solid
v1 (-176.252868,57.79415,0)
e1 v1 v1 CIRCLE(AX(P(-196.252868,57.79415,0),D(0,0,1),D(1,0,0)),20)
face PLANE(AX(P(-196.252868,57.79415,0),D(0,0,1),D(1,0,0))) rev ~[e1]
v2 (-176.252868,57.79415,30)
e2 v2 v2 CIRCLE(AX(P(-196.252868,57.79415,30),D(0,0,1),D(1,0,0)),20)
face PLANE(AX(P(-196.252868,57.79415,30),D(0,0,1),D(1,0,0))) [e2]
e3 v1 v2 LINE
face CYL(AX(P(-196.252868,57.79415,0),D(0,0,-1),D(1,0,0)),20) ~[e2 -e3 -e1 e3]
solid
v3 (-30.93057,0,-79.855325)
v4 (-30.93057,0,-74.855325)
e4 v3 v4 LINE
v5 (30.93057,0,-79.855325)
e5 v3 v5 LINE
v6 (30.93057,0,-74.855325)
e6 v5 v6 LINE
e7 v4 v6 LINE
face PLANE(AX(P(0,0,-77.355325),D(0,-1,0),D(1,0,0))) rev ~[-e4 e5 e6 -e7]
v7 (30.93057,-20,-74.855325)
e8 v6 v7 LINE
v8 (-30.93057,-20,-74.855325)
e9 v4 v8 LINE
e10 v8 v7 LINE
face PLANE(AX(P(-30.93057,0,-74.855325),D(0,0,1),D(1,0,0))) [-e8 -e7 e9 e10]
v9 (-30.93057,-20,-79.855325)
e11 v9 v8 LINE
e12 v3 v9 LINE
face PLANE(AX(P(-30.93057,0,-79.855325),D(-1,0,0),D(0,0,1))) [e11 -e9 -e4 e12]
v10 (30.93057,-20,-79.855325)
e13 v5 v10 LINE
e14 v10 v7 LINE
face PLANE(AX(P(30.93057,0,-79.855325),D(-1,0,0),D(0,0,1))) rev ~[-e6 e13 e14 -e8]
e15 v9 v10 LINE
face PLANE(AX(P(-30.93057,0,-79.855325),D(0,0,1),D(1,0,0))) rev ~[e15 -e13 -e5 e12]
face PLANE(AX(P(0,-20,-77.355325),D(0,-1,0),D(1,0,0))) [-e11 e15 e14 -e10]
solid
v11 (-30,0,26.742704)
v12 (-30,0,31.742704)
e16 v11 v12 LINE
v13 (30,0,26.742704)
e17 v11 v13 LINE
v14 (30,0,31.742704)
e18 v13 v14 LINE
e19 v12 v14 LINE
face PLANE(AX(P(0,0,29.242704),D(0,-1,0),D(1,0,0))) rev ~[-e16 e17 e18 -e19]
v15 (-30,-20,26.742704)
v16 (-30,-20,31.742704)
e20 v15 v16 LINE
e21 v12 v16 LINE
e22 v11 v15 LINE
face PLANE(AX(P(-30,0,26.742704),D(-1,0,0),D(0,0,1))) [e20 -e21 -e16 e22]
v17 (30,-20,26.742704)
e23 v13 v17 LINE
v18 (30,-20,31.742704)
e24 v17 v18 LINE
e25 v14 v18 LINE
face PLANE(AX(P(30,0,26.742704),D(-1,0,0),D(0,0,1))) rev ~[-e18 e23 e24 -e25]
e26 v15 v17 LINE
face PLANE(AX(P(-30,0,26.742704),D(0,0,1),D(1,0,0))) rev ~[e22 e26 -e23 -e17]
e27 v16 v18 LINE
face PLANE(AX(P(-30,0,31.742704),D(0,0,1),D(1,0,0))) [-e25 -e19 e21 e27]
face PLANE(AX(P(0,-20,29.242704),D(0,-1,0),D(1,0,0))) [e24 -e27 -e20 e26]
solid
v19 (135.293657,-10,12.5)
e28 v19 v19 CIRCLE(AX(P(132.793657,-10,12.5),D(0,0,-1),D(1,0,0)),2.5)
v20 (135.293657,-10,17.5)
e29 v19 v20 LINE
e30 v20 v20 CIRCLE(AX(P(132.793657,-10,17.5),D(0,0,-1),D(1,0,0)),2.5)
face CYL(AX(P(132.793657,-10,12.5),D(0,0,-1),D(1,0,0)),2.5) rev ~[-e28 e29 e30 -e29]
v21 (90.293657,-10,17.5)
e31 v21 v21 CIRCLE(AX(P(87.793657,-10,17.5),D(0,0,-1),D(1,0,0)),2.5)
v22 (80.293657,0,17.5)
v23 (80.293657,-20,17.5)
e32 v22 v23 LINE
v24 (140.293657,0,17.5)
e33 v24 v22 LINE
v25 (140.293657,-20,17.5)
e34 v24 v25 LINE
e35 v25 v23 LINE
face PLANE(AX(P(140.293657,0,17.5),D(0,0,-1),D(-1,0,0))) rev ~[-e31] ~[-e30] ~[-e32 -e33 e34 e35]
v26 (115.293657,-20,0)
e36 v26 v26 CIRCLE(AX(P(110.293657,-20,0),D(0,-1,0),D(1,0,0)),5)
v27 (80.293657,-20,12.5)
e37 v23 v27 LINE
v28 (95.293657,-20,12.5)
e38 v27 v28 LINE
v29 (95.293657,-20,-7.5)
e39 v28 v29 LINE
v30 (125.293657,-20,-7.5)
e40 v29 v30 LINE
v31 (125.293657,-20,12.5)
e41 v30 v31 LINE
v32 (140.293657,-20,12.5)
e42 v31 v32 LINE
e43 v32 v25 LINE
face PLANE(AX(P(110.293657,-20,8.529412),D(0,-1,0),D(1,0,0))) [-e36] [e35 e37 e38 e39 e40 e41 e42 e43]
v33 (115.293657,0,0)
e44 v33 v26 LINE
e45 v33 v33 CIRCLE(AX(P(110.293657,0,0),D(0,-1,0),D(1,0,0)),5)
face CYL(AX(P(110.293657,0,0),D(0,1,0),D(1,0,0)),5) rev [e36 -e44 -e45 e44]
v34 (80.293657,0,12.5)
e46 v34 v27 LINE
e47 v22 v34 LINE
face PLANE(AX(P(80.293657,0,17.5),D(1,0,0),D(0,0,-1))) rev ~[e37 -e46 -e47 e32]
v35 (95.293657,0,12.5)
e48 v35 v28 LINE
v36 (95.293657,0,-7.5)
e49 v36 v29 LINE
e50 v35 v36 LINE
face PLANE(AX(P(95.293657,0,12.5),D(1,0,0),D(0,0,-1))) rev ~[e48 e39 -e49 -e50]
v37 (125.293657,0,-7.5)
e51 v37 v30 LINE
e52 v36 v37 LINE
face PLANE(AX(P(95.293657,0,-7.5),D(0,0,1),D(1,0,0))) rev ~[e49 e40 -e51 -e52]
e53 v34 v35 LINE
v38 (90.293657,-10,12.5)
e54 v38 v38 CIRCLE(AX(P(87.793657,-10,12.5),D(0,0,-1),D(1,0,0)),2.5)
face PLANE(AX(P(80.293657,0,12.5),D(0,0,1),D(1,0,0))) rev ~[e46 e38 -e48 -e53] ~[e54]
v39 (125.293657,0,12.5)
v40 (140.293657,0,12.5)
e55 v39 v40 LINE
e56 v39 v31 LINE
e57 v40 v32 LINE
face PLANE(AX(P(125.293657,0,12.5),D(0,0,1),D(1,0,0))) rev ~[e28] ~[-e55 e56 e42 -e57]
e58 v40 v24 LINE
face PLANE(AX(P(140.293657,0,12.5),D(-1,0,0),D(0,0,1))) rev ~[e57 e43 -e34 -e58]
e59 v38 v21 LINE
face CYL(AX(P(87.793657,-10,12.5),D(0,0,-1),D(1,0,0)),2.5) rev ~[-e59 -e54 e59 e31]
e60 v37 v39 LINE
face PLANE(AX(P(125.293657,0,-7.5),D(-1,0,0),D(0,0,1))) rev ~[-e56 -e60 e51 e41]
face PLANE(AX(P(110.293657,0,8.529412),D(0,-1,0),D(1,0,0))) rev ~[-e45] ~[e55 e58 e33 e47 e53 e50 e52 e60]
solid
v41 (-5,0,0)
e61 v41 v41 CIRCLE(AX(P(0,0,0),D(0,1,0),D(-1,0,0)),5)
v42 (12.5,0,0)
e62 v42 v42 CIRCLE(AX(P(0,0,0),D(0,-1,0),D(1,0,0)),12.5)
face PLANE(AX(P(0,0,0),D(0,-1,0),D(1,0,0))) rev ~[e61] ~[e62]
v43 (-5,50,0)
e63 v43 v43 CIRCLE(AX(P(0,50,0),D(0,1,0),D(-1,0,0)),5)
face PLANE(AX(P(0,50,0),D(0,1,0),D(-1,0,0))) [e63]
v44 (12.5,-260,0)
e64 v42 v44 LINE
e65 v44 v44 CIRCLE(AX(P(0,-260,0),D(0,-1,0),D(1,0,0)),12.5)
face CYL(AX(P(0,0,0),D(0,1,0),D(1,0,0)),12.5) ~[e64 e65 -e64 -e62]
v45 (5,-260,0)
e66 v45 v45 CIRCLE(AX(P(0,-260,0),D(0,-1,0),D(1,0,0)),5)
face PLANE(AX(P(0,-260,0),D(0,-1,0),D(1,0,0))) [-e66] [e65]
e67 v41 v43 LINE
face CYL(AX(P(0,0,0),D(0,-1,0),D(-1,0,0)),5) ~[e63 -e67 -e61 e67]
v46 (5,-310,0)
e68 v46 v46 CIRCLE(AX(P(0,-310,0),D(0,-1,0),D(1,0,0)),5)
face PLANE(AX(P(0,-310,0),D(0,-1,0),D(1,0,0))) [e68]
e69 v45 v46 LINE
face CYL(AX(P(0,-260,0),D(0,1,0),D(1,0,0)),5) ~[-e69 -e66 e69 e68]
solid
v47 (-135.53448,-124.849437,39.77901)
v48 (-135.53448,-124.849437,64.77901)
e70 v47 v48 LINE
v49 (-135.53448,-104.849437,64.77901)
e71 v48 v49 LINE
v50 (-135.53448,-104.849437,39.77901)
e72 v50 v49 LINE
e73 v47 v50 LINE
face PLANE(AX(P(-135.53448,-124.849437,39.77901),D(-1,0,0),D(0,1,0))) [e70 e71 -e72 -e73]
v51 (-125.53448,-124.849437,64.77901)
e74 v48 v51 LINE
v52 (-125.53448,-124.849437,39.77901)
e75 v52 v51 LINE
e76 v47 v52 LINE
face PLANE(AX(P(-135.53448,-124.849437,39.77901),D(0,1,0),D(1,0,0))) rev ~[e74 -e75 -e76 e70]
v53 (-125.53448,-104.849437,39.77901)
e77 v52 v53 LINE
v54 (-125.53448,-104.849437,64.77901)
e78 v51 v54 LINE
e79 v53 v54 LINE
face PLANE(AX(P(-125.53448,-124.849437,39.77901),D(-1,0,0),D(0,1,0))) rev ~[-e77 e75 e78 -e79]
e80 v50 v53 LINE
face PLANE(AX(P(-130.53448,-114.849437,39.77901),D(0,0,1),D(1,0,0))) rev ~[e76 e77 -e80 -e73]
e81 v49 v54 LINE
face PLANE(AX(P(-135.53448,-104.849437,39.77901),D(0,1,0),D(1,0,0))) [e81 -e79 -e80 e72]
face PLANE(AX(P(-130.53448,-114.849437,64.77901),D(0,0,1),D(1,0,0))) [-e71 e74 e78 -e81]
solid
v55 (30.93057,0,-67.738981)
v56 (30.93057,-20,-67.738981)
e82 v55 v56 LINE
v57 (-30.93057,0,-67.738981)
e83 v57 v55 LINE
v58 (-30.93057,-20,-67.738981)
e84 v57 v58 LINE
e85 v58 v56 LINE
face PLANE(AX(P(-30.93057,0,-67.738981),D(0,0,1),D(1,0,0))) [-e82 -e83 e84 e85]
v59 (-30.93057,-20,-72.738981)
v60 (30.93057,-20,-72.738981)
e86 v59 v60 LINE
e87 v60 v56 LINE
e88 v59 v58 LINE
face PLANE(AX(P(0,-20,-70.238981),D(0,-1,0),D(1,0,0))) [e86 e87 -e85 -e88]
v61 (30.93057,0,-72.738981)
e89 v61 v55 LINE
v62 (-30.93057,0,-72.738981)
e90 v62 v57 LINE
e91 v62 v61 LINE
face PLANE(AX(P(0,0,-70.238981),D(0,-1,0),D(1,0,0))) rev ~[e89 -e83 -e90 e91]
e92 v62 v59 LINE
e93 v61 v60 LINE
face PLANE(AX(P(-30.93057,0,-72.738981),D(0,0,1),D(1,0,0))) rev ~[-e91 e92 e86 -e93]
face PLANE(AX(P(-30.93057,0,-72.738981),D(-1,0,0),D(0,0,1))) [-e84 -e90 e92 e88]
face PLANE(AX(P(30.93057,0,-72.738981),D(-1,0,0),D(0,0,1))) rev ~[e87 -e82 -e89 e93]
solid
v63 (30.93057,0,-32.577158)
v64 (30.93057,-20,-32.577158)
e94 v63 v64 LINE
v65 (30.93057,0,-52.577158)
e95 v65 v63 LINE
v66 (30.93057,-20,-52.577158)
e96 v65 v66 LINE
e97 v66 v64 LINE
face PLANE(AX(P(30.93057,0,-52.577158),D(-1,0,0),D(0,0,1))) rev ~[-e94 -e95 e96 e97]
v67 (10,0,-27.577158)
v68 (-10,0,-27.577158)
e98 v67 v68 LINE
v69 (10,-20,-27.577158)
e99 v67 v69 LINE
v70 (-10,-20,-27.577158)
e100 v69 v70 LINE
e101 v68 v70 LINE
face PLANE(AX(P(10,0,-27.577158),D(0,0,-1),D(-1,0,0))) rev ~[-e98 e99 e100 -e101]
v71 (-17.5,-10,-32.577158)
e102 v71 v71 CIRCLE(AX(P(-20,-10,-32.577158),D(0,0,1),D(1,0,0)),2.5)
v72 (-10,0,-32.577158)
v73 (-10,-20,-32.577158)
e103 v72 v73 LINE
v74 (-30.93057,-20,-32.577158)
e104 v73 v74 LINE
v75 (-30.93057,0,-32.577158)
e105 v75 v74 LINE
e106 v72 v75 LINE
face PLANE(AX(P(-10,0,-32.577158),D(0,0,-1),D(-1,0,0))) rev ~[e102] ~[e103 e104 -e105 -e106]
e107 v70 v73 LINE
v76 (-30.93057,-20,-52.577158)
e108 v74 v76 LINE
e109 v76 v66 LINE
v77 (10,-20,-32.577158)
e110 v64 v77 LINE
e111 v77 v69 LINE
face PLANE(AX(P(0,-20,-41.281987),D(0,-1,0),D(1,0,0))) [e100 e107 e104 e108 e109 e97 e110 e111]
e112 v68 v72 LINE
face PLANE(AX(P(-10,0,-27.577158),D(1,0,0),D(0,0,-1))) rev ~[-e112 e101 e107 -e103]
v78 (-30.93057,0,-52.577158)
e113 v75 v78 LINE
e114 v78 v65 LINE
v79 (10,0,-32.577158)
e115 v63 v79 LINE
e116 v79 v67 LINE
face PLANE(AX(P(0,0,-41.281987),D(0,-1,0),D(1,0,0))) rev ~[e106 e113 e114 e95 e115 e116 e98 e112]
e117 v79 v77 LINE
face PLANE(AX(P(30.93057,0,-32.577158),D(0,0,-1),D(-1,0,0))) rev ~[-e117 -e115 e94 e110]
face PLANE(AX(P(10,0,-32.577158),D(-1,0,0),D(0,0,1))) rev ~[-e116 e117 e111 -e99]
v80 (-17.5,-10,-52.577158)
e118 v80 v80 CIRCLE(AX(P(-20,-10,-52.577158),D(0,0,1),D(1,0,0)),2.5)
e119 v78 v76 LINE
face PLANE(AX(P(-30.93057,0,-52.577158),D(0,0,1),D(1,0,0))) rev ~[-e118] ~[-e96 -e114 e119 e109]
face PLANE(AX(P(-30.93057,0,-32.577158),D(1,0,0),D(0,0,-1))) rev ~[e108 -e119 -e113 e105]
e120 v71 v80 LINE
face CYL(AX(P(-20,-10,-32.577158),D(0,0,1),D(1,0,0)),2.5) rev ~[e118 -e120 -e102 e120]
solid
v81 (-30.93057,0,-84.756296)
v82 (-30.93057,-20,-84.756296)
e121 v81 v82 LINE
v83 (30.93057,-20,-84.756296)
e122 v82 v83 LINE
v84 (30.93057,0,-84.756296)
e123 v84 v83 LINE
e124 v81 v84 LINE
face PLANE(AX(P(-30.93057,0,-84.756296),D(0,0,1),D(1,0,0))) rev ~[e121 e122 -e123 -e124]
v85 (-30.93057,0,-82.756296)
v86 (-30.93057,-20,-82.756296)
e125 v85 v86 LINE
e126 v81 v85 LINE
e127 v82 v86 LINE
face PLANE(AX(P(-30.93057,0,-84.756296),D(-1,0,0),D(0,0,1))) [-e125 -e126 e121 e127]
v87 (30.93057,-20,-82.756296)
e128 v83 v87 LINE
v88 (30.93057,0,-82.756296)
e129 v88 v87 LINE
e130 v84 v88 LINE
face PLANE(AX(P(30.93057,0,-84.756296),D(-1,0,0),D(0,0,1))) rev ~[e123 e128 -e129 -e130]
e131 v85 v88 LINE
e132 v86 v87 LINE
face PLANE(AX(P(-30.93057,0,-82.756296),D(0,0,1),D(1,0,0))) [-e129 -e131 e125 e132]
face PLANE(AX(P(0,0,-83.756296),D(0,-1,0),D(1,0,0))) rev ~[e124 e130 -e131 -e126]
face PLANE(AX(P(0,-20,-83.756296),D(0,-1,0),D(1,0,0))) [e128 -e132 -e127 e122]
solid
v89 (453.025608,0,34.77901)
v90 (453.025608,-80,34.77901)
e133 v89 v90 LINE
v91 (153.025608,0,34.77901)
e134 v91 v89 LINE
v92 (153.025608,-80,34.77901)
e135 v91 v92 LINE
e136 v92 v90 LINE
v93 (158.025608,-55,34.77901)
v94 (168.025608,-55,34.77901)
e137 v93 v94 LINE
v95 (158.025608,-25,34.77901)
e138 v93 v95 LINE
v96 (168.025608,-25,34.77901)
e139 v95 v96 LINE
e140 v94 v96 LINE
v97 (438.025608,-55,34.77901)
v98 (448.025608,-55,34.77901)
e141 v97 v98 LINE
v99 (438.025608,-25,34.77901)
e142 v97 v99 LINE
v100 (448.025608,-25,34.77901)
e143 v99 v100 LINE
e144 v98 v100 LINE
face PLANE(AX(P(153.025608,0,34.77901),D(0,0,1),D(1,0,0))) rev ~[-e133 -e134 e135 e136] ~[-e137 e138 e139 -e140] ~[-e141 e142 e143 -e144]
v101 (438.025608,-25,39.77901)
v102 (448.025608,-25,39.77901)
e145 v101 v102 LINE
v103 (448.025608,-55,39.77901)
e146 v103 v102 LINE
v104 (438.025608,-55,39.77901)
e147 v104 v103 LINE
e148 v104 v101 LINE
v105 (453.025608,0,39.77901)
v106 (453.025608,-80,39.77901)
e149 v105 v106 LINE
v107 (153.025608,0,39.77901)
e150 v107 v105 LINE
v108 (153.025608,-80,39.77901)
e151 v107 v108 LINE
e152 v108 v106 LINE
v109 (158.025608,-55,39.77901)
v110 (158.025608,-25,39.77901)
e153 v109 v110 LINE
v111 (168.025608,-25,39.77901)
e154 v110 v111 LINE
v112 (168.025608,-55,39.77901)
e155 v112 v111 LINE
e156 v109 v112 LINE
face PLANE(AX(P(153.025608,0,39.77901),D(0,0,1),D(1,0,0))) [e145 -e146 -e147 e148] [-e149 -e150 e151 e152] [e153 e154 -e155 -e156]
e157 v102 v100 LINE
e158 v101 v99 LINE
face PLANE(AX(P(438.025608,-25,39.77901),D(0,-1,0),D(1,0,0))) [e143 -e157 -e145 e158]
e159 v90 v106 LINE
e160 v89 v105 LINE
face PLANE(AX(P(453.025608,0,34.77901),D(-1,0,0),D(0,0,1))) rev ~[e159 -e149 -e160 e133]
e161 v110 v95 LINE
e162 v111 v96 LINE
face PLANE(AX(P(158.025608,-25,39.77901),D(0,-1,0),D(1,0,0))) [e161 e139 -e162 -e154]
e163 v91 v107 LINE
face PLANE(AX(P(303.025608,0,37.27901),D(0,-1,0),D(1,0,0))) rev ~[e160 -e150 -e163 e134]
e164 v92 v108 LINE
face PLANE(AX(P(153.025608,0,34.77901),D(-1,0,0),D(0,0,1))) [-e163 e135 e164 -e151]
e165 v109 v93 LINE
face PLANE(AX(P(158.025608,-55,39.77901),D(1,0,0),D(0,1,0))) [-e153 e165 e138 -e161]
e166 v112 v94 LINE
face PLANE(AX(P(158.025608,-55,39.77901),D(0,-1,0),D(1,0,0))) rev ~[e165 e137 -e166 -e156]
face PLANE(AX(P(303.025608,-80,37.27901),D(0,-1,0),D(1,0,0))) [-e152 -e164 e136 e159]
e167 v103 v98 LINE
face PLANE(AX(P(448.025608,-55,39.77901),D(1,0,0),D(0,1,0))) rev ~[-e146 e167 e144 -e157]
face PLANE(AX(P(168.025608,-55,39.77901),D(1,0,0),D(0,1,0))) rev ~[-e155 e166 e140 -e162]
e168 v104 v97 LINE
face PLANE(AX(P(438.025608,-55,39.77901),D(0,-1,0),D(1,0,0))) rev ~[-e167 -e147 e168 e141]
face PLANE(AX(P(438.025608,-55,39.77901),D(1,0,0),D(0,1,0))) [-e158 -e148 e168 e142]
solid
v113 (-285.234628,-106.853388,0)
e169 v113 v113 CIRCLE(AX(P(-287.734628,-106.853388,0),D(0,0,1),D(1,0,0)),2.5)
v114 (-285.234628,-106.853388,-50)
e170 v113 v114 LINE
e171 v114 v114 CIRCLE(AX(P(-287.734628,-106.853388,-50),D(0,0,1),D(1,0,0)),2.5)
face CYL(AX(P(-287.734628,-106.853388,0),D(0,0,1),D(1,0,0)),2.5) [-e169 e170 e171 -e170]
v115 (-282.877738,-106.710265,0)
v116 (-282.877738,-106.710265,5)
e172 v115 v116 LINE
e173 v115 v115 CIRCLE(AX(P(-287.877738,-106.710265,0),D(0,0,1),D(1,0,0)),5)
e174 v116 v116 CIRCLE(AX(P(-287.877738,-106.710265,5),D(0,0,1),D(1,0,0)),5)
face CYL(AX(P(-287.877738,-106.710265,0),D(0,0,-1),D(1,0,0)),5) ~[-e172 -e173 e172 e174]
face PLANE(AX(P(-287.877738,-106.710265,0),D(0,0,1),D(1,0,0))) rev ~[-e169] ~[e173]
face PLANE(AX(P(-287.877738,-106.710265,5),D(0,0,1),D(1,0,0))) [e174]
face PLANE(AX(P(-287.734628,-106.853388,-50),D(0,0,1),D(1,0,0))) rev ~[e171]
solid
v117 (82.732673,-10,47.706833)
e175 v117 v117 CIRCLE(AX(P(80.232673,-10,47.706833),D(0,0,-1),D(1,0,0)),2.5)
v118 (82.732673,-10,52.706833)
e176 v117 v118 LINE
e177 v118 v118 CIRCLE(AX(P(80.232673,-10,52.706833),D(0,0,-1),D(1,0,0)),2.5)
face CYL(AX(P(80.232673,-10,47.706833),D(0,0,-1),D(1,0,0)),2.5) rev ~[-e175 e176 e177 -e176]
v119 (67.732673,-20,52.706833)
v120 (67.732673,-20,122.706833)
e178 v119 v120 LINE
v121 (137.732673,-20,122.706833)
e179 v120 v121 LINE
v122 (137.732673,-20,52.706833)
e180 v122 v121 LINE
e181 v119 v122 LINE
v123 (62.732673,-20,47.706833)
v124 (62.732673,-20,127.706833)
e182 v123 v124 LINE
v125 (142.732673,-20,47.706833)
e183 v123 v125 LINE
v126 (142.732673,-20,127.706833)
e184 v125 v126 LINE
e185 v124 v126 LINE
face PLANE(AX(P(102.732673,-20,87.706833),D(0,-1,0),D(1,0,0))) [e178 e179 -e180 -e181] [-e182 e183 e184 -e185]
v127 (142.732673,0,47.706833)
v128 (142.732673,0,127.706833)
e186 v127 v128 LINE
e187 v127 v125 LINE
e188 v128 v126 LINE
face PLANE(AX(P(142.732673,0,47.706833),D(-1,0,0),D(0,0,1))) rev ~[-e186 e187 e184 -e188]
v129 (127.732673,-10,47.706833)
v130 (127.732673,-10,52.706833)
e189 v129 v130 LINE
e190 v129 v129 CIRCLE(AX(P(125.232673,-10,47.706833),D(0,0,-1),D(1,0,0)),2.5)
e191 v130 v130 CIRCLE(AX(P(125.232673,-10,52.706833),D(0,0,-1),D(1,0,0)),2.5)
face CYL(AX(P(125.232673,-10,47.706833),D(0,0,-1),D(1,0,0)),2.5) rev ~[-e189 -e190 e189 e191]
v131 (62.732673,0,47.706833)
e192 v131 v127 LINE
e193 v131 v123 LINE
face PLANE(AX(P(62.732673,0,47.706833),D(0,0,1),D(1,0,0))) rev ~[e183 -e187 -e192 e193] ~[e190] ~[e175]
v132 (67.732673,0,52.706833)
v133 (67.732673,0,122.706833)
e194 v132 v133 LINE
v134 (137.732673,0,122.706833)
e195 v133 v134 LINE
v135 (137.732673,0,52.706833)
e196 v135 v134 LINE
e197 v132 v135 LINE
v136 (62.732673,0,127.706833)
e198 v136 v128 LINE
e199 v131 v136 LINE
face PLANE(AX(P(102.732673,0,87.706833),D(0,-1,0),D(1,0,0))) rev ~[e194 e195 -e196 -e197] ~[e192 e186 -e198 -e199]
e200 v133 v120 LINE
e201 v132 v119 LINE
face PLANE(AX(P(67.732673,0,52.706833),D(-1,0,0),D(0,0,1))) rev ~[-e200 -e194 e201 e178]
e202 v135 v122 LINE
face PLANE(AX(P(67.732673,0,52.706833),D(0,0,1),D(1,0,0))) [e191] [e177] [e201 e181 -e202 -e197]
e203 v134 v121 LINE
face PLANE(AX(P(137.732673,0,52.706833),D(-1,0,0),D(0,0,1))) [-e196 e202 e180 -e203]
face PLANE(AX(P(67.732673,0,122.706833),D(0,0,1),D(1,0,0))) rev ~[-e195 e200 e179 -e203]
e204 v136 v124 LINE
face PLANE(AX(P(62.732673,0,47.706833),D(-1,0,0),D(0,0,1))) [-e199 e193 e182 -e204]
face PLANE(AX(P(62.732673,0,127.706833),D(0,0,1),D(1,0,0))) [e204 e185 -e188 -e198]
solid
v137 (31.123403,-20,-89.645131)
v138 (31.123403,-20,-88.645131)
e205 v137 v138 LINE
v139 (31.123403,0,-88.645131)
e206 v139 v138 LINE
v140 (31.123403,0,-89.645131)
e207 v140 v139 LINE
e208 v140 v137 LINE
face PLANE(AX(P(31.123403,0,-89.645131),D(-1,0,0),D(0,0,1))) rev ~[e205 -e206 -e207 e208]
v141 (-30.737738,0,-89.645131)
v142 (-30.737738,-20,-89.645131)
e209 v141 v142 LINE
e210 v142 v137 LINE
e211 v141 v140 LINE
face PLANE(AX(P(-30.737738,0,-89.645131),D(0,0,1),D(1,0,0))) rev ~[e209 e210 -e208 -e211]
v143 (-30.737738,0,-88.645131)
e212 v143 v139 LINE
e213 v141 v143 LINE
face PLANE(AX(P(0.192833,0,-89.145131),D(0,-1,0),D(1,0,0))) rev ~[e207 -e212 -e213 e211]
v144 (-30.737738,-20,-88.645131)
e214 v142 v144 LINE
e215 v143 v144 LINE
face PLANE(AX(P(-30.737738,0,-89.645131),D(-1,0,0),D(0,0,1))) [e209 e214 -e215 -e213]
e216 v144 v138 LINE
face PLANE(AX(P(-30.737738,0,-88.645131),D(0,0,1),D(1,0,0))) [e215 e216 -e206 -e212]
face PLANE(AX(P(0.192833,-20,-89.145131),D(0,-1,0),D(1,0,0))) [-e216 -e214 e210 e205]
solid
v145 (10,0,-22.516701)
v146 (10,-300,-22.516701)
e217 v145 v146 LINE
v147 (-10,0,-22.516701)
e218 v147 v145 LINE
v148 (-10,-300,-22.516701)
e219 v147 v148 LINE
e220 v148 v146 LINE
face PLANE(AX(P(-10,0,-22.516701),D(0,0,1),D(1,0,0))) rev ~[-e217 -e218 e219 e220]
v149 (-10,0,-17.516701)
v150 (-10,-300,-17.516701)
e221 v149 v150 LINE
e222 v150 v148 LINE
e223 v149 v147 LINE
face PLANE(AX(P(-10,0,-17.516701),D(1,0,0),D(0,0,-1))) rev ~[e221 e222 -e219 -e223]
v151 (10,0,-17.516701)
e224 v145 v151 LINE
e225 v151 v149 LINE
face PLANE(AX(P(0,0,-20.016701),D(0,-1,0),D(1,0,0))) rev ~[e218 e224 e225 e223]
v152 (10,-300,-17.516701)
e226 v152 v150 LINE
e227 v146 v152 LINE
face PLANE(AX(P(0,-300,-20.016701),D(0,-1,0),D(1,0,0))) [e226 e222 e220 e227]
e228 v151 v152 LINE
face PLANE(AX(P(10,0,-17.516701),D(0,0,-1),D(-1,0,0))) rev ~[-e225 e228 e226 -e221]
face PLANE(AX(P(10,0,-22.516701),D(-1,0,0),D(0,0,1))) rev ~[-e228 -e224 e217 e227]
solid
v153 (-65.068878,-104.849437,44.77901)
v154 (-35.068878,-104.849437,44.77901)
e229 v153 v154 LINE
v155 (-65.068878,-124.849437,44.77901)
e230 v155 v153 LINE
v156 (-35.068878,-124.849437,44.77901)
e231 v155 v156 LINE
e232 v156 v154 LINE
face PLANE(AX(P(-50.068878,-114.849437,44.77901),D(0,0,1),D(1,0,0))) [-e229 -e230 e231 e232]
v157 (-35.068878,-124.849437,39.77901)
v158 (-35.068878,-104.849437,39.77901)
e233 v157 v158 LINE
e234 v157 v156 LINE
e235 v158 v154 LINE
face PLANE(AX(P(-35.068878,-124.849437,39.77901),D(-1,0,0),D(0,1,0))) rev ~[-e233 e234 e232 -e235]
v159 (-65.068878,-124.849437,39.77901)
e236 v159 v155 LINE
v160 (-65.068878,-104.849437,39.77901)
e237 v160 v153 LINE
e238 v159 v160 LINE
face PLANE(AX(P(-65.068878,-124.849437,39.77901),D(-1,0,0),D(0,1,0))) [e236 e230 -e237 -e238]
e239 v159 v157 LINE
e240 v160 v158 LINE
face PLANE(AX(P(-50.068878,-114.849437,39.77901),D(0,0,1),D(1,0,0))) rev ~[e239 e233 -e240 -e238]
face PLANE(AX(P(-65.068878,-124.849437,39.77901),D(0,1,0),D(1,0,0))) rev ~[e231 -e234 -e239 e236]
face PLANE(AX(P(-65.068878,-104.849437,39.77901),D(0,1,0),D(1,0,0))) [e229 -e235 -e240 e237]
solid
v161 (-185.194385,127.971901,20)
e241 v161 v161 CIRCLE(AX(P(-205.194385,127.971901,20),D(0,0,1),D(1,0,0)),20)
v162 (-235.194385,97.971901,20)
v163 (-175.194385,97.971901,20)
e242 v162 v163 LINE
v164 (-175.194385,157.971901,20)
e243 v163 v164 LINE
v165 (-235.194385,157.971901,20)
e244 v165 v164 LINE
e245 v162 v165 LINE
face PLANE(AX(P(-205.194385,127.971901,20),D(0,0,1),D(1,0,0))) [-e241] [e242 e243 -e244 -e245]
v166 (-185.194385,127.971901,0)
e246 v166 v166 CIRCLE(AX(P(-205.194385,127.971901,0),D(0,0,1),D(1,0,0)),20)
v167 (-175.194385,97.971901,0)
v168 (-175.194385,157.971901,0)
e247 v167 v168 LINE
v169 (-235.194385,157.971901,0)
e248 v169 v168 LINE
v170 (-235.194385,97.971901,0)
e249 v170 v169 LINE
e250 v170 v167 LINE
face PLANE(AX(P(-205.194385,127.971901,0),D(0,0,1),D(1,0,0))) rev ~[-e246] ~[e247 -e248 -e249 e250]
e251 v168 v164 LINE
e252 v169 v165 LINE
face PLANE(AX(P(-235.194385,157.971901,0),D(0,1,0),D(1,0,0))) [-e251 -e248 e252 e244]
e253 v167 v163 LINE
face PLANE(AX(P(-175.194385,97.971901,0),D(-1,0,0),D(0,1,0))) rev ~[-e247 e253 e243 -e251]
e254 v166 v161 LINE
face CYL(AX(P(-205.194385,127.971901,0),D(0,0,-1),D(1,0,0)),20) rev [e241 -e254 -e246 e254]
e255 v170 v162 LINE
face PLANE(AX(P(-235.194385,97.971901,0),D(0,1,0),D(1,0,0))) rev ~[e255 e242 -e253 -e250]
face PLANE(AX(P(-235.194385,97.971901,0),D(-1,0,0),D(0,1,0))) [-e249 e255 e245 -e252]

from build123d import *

# Parameters (mm, degrees)
F0_R      = 5
F1_DEPTH  = 20
F0_W      = 60
F0_H      = 5
F0_W_2    = 80
F0_H_2    = 80
F0_W_3    = 70
F0_H_3    = 70
F0_W_4    = 61.861140081
F0_H_4    = 1
F0_H_5    = 2
F0_R_2    = 12.5
F2_DEPTH  = 260
F3_R      = 5
F4_DEPTH  = 50
F5_DEPTH  = 300
F6_R      = 2.5
F7_DEPTH  = 25
F9_R      = 2.5
F8_R      = 2.5
F10_DEPTH = 25
F14_R     = 5
F15_DEPTH = 50
F16_W     = 300
F16_H     = 5
F17_DEPTH = 80
F19_R     = 20
F20_DEPTH = 30
F19_W     = 60
F19_H     = 60
F21_DEPTH = 20
F18_W     = 10
F18_H     = 30
F22_DEPTH = 129.4251411048
F18_H_2   = 20
F23_DEPTH = 25
F18_W_2   = 30
F24_DEPTH = 5
F13_R     = 2.5
F25_DEPTH = 5
F26_R     = 5
F27_DEPTH = 5
F28_R     = 2.5
F29_DEPTH = 50


# Not quite as in the source:
# - a feature of the source that left no trace in its solid (it failed there, or was rolled back) is left out
# - a feature names something its author has since deleted; it is built from what else it names


with BuildPart() as f1:
    # F0 (on Front) → F1 (new body)
    with BuildSketch(Plane.XZ):
        Polygon((95.2936565876, -7.5), (110.2936565876, -7.5), (125.2936565876, -7.5), (125.2936565876, 12.5), (140.2936565876, 12.5), (140.2936565876, 17.5), (110.2936565876, 17.5), (80.2936565876, 17.5), (80.2936565876, 12.5), (95.2936565876, 12.5), align=None)
        with Locations((110.2936565876, 0)):
            Circle(F0_R, mode=Mode.SUBTRACT)
    extrude(amount=F1_DEPTH)

    # F9 (on face) + F8 (on face) → F10 (cut)
    with BuildSketch(Plane(origin=(0, 0, 12.5), x_dir=(1, 0, 0), z_dir=(0, 0, -1))):
        with Locations((87.7936565876, 10)):
            Circle(F9_R)
    with BuildSketch(Plane(origin=(0, 0, 12.5), x_dir=(1, 0, 0), z_dir=(0, 0, -1))):
        with Locations((132.7936565876, 10)):
            Circle(F8_R)
    extrude(amount=-F10_DEPTH, mode=Mode.SUBTRACT)


with BuildPart() as f1b:
    # F0 (on Front) → F1, piece 2 (new body)
    with BuildSketch(Plane.XZ):
        with Locations((0, 29.2427036911)):
            Rectangle(F0_W, F0_H)
    extrude(amount=F1_DEPTH)


with BuildPart() as f1c:
    # F0 (on Front) → F1, piece 3 (new body)
    with BuildSketch(Plane.XZ):
        Polygon((10, -27.5771580637), (0, -27.5771580637), (-10, -27.5771580637), (-10, -32.5771580637), (-10.9305700405, -32.5771580637), (-30.9305700405, -32.5771580637), (-30.9305700405, -52.5771580637), (0, -52.5771580637), (30.9305700405, -52.5771580637), (30.9305700405, -32.5771580637), (10.9305700405, -32.5771580637), (10, -32.5771580637), align=None)
    extrude(amount=F1_DEPTH)

    # F6 (on face) → F7 (cut)
    with BuildSketch(Plane.XY.offset(-32.5771580637)):
        with Locations((-20, -10)):
            Circle(F6_R)
    extrude(amount=-F7_DEPTH, mode=Mode.SUBTRACT)


with BuildPart() as f1d:
    # F0 (on Front) → F1, piece 4 (new body)
    with BuildSketch(Plane.XZ):
        with Locations((102.7326732874, 87.7068325877)):
            Rectangle(F0_W_2, F0_H_2)
        with Locations((102.7326732874, 87.7068325877)):
            Rectangle(F0_W_3, F0_H_3, mode=Mode.SUBTRACT)
    extrude(amount=F1_DEPTH)

    # F13 (on face) → F25 (cut, through all)
    with BuildSketch(Plane(origin=(0, 0, 47.7068325877), x_dir=(1, 0, 0), z_dir=(0, 0, -1))):
        with Locations((125.2326732874, 10)):
            Circle(F13_R)
        with Locations((80.2326732874, 10)):
            Circle(F13_R)
    extrude(amount=-F25_DEPTH, mode=Mode.SUBTRACT)


with BuildPart() as f1e:
    # F0 (on Front) → F1, piece 5 (new body)
    with BuildSketch(Plane.XZ):
        with Locations((0, -77.355325222)):
            Rectangle(F0_W_4, F0_H)
    extrude(amount=F1_DEPTH)


with BuildPart() as f1f:
    # F0 (on Front) → F1, piece 6 (new body)
    with BuildSketch(Plane.XZ):
        with Locations((0.1928325291, -89.1451310813)):
            Rectangle(F0_W_4, F0_H_4)
    extrude(amount=F1_DEPTH)


with BuildPart() as f1g:
    # F0 (on Front) → F1, piece 7 (new body)
    with BuildSketch(Plane.XZ):
        with Locations((0, -83.756296128)):
            Rectangle(F0_W_4, F0_H_5)
    extrude(amount=F1_DEPTH)


with BuildPart() as f1h:
    # F0 (on Front) → F1, piece 8 (new body)
    with BuildSketch(Plane.XZ):
        with Locations((0, -70.2389810979)):
            Rectangle(F0_W_4, F0_H)
    extrude(amount=F1_DEPTH)


with BuildPart() as f2:
    # F0 (on Front) → F2 (new body)
    with BuildSketch(Plane.XZ):
        Circle(F0_R_2)
    extrude(amount=F2_DEPTH)

    # F3 (on face) → F4 (join)
    with BuildSketch(Plane.XZ.offset(260)):
        Circle(F3_R)
    extrude(amount=F4_DEPTH)

    # F14 (on face) → F15 (join)
    with BuildSketch(Plane(origin=(0, 0, 0), x_dir=(-1, 0, 0), z_dir=(0, 1, 0))):
        Circle(F14_R)
    extrude(amount=F15_DEPTH)


with BuildPart() as f5:
    # F0 (on Front) → F5 (new body)
    with BuildSketch(Plane.XZ):
        Polygon((-10, -22.5167013705), (0, -22.5167013705), (10, -22.5167013705), (10, -17.5167013705), (0, -17.5167013705), (-10, -17.5167013705), align=None)
    extrude(amount=F5_DEPTH)


with BuildPart() as f17:
    # F16 (on Front) → F17 (new body)
    with BuildSketch(Plane.XZ):
        with Locations((303.0256081372, 37.2790100235)):
            Rectangle(F16_W, F16_H)
    extrude(amount=F17_DEPTH)

    # F18 (on face) → F22 (cut, through all)
    with BuildSketch(Plane.XY.offset(39.7790100235)):
        with Locations((163.0256081372, -40)):
            Rectangle(F18_W, F18_H)
        with Locations((443.0256081372, -40)):
            Rectangle(F18_W, F18_H)
    extrude(amount=-F22_DEPTH, mode=Mode.SUBTRACT)


with BuildPart() as f20:
    # F19 (on Top) → F20 (new body)
    with BuildSketch(Plane.XY):
        with Locations((-196.2528675795, 57.794149965)):
            Circle(F19_R)
    extrude(amount=F20_DEPTH)


with BuildPart() as f21:
    # F19 (on Top) → F21 (new body)
    with BuildSketch(Plane.XY):
        with Locations((-205.1943850517, 127.9719012976)):
            Rectangle(F19_W, F19_H)
        with Locations((-205.1943850517, 127.9719012976)):
            Circle(F19_R, mode=Mode.SUBTRACT)
    extrude(amount=F21_DEPTH)


with BuildPart() as f23:
    # F18 (on face) → F23 (new body)
    with BuildSketch(Plane.XY.offset(39.7790100235)):
        with Locations((-130.5344802141, -114.8494374752)):
            Rectangle(F18_W, F18_H_2)
    extrude(amount=F23_DEPTH)


with BuildPart() as f24:
    # F18 (on face) → F24 (new body)
    with BuildSketch(Plane.XY.offset(39.7790100235)):
        with Locations((-50.0688782334, -114.8494374752)):
            Rectangle(F18_W_2, F18_H_2)
    extrude(amount=F24_DEPTH)


with BuildPart() as f27:
    # F26 (on Top) → F27 (new body)
    with BuildSketch(Plane.XY):
        with Locations((-287.8777384163, -106.7102653366)):
            Circle(F26_R)
    extrude(amount=F27_DEPTH)

    # F28 (on face) → F29 (join)
    with BuildSketch(Plane.XY):
        with Locations((-287.7346277237, -106.8533882499)):
            Circle(F28_R)
    extrude(amount=-F29_DEPTH)


solid = Compound([f1.part, f1b.part, f1c.part, f1d.part, f1e.part, f1f.part, f1g.part, f1h.part, f2.part, f5.part, f17.part, f20.part, f21.part, f23.part, f24.part, f27.part])
